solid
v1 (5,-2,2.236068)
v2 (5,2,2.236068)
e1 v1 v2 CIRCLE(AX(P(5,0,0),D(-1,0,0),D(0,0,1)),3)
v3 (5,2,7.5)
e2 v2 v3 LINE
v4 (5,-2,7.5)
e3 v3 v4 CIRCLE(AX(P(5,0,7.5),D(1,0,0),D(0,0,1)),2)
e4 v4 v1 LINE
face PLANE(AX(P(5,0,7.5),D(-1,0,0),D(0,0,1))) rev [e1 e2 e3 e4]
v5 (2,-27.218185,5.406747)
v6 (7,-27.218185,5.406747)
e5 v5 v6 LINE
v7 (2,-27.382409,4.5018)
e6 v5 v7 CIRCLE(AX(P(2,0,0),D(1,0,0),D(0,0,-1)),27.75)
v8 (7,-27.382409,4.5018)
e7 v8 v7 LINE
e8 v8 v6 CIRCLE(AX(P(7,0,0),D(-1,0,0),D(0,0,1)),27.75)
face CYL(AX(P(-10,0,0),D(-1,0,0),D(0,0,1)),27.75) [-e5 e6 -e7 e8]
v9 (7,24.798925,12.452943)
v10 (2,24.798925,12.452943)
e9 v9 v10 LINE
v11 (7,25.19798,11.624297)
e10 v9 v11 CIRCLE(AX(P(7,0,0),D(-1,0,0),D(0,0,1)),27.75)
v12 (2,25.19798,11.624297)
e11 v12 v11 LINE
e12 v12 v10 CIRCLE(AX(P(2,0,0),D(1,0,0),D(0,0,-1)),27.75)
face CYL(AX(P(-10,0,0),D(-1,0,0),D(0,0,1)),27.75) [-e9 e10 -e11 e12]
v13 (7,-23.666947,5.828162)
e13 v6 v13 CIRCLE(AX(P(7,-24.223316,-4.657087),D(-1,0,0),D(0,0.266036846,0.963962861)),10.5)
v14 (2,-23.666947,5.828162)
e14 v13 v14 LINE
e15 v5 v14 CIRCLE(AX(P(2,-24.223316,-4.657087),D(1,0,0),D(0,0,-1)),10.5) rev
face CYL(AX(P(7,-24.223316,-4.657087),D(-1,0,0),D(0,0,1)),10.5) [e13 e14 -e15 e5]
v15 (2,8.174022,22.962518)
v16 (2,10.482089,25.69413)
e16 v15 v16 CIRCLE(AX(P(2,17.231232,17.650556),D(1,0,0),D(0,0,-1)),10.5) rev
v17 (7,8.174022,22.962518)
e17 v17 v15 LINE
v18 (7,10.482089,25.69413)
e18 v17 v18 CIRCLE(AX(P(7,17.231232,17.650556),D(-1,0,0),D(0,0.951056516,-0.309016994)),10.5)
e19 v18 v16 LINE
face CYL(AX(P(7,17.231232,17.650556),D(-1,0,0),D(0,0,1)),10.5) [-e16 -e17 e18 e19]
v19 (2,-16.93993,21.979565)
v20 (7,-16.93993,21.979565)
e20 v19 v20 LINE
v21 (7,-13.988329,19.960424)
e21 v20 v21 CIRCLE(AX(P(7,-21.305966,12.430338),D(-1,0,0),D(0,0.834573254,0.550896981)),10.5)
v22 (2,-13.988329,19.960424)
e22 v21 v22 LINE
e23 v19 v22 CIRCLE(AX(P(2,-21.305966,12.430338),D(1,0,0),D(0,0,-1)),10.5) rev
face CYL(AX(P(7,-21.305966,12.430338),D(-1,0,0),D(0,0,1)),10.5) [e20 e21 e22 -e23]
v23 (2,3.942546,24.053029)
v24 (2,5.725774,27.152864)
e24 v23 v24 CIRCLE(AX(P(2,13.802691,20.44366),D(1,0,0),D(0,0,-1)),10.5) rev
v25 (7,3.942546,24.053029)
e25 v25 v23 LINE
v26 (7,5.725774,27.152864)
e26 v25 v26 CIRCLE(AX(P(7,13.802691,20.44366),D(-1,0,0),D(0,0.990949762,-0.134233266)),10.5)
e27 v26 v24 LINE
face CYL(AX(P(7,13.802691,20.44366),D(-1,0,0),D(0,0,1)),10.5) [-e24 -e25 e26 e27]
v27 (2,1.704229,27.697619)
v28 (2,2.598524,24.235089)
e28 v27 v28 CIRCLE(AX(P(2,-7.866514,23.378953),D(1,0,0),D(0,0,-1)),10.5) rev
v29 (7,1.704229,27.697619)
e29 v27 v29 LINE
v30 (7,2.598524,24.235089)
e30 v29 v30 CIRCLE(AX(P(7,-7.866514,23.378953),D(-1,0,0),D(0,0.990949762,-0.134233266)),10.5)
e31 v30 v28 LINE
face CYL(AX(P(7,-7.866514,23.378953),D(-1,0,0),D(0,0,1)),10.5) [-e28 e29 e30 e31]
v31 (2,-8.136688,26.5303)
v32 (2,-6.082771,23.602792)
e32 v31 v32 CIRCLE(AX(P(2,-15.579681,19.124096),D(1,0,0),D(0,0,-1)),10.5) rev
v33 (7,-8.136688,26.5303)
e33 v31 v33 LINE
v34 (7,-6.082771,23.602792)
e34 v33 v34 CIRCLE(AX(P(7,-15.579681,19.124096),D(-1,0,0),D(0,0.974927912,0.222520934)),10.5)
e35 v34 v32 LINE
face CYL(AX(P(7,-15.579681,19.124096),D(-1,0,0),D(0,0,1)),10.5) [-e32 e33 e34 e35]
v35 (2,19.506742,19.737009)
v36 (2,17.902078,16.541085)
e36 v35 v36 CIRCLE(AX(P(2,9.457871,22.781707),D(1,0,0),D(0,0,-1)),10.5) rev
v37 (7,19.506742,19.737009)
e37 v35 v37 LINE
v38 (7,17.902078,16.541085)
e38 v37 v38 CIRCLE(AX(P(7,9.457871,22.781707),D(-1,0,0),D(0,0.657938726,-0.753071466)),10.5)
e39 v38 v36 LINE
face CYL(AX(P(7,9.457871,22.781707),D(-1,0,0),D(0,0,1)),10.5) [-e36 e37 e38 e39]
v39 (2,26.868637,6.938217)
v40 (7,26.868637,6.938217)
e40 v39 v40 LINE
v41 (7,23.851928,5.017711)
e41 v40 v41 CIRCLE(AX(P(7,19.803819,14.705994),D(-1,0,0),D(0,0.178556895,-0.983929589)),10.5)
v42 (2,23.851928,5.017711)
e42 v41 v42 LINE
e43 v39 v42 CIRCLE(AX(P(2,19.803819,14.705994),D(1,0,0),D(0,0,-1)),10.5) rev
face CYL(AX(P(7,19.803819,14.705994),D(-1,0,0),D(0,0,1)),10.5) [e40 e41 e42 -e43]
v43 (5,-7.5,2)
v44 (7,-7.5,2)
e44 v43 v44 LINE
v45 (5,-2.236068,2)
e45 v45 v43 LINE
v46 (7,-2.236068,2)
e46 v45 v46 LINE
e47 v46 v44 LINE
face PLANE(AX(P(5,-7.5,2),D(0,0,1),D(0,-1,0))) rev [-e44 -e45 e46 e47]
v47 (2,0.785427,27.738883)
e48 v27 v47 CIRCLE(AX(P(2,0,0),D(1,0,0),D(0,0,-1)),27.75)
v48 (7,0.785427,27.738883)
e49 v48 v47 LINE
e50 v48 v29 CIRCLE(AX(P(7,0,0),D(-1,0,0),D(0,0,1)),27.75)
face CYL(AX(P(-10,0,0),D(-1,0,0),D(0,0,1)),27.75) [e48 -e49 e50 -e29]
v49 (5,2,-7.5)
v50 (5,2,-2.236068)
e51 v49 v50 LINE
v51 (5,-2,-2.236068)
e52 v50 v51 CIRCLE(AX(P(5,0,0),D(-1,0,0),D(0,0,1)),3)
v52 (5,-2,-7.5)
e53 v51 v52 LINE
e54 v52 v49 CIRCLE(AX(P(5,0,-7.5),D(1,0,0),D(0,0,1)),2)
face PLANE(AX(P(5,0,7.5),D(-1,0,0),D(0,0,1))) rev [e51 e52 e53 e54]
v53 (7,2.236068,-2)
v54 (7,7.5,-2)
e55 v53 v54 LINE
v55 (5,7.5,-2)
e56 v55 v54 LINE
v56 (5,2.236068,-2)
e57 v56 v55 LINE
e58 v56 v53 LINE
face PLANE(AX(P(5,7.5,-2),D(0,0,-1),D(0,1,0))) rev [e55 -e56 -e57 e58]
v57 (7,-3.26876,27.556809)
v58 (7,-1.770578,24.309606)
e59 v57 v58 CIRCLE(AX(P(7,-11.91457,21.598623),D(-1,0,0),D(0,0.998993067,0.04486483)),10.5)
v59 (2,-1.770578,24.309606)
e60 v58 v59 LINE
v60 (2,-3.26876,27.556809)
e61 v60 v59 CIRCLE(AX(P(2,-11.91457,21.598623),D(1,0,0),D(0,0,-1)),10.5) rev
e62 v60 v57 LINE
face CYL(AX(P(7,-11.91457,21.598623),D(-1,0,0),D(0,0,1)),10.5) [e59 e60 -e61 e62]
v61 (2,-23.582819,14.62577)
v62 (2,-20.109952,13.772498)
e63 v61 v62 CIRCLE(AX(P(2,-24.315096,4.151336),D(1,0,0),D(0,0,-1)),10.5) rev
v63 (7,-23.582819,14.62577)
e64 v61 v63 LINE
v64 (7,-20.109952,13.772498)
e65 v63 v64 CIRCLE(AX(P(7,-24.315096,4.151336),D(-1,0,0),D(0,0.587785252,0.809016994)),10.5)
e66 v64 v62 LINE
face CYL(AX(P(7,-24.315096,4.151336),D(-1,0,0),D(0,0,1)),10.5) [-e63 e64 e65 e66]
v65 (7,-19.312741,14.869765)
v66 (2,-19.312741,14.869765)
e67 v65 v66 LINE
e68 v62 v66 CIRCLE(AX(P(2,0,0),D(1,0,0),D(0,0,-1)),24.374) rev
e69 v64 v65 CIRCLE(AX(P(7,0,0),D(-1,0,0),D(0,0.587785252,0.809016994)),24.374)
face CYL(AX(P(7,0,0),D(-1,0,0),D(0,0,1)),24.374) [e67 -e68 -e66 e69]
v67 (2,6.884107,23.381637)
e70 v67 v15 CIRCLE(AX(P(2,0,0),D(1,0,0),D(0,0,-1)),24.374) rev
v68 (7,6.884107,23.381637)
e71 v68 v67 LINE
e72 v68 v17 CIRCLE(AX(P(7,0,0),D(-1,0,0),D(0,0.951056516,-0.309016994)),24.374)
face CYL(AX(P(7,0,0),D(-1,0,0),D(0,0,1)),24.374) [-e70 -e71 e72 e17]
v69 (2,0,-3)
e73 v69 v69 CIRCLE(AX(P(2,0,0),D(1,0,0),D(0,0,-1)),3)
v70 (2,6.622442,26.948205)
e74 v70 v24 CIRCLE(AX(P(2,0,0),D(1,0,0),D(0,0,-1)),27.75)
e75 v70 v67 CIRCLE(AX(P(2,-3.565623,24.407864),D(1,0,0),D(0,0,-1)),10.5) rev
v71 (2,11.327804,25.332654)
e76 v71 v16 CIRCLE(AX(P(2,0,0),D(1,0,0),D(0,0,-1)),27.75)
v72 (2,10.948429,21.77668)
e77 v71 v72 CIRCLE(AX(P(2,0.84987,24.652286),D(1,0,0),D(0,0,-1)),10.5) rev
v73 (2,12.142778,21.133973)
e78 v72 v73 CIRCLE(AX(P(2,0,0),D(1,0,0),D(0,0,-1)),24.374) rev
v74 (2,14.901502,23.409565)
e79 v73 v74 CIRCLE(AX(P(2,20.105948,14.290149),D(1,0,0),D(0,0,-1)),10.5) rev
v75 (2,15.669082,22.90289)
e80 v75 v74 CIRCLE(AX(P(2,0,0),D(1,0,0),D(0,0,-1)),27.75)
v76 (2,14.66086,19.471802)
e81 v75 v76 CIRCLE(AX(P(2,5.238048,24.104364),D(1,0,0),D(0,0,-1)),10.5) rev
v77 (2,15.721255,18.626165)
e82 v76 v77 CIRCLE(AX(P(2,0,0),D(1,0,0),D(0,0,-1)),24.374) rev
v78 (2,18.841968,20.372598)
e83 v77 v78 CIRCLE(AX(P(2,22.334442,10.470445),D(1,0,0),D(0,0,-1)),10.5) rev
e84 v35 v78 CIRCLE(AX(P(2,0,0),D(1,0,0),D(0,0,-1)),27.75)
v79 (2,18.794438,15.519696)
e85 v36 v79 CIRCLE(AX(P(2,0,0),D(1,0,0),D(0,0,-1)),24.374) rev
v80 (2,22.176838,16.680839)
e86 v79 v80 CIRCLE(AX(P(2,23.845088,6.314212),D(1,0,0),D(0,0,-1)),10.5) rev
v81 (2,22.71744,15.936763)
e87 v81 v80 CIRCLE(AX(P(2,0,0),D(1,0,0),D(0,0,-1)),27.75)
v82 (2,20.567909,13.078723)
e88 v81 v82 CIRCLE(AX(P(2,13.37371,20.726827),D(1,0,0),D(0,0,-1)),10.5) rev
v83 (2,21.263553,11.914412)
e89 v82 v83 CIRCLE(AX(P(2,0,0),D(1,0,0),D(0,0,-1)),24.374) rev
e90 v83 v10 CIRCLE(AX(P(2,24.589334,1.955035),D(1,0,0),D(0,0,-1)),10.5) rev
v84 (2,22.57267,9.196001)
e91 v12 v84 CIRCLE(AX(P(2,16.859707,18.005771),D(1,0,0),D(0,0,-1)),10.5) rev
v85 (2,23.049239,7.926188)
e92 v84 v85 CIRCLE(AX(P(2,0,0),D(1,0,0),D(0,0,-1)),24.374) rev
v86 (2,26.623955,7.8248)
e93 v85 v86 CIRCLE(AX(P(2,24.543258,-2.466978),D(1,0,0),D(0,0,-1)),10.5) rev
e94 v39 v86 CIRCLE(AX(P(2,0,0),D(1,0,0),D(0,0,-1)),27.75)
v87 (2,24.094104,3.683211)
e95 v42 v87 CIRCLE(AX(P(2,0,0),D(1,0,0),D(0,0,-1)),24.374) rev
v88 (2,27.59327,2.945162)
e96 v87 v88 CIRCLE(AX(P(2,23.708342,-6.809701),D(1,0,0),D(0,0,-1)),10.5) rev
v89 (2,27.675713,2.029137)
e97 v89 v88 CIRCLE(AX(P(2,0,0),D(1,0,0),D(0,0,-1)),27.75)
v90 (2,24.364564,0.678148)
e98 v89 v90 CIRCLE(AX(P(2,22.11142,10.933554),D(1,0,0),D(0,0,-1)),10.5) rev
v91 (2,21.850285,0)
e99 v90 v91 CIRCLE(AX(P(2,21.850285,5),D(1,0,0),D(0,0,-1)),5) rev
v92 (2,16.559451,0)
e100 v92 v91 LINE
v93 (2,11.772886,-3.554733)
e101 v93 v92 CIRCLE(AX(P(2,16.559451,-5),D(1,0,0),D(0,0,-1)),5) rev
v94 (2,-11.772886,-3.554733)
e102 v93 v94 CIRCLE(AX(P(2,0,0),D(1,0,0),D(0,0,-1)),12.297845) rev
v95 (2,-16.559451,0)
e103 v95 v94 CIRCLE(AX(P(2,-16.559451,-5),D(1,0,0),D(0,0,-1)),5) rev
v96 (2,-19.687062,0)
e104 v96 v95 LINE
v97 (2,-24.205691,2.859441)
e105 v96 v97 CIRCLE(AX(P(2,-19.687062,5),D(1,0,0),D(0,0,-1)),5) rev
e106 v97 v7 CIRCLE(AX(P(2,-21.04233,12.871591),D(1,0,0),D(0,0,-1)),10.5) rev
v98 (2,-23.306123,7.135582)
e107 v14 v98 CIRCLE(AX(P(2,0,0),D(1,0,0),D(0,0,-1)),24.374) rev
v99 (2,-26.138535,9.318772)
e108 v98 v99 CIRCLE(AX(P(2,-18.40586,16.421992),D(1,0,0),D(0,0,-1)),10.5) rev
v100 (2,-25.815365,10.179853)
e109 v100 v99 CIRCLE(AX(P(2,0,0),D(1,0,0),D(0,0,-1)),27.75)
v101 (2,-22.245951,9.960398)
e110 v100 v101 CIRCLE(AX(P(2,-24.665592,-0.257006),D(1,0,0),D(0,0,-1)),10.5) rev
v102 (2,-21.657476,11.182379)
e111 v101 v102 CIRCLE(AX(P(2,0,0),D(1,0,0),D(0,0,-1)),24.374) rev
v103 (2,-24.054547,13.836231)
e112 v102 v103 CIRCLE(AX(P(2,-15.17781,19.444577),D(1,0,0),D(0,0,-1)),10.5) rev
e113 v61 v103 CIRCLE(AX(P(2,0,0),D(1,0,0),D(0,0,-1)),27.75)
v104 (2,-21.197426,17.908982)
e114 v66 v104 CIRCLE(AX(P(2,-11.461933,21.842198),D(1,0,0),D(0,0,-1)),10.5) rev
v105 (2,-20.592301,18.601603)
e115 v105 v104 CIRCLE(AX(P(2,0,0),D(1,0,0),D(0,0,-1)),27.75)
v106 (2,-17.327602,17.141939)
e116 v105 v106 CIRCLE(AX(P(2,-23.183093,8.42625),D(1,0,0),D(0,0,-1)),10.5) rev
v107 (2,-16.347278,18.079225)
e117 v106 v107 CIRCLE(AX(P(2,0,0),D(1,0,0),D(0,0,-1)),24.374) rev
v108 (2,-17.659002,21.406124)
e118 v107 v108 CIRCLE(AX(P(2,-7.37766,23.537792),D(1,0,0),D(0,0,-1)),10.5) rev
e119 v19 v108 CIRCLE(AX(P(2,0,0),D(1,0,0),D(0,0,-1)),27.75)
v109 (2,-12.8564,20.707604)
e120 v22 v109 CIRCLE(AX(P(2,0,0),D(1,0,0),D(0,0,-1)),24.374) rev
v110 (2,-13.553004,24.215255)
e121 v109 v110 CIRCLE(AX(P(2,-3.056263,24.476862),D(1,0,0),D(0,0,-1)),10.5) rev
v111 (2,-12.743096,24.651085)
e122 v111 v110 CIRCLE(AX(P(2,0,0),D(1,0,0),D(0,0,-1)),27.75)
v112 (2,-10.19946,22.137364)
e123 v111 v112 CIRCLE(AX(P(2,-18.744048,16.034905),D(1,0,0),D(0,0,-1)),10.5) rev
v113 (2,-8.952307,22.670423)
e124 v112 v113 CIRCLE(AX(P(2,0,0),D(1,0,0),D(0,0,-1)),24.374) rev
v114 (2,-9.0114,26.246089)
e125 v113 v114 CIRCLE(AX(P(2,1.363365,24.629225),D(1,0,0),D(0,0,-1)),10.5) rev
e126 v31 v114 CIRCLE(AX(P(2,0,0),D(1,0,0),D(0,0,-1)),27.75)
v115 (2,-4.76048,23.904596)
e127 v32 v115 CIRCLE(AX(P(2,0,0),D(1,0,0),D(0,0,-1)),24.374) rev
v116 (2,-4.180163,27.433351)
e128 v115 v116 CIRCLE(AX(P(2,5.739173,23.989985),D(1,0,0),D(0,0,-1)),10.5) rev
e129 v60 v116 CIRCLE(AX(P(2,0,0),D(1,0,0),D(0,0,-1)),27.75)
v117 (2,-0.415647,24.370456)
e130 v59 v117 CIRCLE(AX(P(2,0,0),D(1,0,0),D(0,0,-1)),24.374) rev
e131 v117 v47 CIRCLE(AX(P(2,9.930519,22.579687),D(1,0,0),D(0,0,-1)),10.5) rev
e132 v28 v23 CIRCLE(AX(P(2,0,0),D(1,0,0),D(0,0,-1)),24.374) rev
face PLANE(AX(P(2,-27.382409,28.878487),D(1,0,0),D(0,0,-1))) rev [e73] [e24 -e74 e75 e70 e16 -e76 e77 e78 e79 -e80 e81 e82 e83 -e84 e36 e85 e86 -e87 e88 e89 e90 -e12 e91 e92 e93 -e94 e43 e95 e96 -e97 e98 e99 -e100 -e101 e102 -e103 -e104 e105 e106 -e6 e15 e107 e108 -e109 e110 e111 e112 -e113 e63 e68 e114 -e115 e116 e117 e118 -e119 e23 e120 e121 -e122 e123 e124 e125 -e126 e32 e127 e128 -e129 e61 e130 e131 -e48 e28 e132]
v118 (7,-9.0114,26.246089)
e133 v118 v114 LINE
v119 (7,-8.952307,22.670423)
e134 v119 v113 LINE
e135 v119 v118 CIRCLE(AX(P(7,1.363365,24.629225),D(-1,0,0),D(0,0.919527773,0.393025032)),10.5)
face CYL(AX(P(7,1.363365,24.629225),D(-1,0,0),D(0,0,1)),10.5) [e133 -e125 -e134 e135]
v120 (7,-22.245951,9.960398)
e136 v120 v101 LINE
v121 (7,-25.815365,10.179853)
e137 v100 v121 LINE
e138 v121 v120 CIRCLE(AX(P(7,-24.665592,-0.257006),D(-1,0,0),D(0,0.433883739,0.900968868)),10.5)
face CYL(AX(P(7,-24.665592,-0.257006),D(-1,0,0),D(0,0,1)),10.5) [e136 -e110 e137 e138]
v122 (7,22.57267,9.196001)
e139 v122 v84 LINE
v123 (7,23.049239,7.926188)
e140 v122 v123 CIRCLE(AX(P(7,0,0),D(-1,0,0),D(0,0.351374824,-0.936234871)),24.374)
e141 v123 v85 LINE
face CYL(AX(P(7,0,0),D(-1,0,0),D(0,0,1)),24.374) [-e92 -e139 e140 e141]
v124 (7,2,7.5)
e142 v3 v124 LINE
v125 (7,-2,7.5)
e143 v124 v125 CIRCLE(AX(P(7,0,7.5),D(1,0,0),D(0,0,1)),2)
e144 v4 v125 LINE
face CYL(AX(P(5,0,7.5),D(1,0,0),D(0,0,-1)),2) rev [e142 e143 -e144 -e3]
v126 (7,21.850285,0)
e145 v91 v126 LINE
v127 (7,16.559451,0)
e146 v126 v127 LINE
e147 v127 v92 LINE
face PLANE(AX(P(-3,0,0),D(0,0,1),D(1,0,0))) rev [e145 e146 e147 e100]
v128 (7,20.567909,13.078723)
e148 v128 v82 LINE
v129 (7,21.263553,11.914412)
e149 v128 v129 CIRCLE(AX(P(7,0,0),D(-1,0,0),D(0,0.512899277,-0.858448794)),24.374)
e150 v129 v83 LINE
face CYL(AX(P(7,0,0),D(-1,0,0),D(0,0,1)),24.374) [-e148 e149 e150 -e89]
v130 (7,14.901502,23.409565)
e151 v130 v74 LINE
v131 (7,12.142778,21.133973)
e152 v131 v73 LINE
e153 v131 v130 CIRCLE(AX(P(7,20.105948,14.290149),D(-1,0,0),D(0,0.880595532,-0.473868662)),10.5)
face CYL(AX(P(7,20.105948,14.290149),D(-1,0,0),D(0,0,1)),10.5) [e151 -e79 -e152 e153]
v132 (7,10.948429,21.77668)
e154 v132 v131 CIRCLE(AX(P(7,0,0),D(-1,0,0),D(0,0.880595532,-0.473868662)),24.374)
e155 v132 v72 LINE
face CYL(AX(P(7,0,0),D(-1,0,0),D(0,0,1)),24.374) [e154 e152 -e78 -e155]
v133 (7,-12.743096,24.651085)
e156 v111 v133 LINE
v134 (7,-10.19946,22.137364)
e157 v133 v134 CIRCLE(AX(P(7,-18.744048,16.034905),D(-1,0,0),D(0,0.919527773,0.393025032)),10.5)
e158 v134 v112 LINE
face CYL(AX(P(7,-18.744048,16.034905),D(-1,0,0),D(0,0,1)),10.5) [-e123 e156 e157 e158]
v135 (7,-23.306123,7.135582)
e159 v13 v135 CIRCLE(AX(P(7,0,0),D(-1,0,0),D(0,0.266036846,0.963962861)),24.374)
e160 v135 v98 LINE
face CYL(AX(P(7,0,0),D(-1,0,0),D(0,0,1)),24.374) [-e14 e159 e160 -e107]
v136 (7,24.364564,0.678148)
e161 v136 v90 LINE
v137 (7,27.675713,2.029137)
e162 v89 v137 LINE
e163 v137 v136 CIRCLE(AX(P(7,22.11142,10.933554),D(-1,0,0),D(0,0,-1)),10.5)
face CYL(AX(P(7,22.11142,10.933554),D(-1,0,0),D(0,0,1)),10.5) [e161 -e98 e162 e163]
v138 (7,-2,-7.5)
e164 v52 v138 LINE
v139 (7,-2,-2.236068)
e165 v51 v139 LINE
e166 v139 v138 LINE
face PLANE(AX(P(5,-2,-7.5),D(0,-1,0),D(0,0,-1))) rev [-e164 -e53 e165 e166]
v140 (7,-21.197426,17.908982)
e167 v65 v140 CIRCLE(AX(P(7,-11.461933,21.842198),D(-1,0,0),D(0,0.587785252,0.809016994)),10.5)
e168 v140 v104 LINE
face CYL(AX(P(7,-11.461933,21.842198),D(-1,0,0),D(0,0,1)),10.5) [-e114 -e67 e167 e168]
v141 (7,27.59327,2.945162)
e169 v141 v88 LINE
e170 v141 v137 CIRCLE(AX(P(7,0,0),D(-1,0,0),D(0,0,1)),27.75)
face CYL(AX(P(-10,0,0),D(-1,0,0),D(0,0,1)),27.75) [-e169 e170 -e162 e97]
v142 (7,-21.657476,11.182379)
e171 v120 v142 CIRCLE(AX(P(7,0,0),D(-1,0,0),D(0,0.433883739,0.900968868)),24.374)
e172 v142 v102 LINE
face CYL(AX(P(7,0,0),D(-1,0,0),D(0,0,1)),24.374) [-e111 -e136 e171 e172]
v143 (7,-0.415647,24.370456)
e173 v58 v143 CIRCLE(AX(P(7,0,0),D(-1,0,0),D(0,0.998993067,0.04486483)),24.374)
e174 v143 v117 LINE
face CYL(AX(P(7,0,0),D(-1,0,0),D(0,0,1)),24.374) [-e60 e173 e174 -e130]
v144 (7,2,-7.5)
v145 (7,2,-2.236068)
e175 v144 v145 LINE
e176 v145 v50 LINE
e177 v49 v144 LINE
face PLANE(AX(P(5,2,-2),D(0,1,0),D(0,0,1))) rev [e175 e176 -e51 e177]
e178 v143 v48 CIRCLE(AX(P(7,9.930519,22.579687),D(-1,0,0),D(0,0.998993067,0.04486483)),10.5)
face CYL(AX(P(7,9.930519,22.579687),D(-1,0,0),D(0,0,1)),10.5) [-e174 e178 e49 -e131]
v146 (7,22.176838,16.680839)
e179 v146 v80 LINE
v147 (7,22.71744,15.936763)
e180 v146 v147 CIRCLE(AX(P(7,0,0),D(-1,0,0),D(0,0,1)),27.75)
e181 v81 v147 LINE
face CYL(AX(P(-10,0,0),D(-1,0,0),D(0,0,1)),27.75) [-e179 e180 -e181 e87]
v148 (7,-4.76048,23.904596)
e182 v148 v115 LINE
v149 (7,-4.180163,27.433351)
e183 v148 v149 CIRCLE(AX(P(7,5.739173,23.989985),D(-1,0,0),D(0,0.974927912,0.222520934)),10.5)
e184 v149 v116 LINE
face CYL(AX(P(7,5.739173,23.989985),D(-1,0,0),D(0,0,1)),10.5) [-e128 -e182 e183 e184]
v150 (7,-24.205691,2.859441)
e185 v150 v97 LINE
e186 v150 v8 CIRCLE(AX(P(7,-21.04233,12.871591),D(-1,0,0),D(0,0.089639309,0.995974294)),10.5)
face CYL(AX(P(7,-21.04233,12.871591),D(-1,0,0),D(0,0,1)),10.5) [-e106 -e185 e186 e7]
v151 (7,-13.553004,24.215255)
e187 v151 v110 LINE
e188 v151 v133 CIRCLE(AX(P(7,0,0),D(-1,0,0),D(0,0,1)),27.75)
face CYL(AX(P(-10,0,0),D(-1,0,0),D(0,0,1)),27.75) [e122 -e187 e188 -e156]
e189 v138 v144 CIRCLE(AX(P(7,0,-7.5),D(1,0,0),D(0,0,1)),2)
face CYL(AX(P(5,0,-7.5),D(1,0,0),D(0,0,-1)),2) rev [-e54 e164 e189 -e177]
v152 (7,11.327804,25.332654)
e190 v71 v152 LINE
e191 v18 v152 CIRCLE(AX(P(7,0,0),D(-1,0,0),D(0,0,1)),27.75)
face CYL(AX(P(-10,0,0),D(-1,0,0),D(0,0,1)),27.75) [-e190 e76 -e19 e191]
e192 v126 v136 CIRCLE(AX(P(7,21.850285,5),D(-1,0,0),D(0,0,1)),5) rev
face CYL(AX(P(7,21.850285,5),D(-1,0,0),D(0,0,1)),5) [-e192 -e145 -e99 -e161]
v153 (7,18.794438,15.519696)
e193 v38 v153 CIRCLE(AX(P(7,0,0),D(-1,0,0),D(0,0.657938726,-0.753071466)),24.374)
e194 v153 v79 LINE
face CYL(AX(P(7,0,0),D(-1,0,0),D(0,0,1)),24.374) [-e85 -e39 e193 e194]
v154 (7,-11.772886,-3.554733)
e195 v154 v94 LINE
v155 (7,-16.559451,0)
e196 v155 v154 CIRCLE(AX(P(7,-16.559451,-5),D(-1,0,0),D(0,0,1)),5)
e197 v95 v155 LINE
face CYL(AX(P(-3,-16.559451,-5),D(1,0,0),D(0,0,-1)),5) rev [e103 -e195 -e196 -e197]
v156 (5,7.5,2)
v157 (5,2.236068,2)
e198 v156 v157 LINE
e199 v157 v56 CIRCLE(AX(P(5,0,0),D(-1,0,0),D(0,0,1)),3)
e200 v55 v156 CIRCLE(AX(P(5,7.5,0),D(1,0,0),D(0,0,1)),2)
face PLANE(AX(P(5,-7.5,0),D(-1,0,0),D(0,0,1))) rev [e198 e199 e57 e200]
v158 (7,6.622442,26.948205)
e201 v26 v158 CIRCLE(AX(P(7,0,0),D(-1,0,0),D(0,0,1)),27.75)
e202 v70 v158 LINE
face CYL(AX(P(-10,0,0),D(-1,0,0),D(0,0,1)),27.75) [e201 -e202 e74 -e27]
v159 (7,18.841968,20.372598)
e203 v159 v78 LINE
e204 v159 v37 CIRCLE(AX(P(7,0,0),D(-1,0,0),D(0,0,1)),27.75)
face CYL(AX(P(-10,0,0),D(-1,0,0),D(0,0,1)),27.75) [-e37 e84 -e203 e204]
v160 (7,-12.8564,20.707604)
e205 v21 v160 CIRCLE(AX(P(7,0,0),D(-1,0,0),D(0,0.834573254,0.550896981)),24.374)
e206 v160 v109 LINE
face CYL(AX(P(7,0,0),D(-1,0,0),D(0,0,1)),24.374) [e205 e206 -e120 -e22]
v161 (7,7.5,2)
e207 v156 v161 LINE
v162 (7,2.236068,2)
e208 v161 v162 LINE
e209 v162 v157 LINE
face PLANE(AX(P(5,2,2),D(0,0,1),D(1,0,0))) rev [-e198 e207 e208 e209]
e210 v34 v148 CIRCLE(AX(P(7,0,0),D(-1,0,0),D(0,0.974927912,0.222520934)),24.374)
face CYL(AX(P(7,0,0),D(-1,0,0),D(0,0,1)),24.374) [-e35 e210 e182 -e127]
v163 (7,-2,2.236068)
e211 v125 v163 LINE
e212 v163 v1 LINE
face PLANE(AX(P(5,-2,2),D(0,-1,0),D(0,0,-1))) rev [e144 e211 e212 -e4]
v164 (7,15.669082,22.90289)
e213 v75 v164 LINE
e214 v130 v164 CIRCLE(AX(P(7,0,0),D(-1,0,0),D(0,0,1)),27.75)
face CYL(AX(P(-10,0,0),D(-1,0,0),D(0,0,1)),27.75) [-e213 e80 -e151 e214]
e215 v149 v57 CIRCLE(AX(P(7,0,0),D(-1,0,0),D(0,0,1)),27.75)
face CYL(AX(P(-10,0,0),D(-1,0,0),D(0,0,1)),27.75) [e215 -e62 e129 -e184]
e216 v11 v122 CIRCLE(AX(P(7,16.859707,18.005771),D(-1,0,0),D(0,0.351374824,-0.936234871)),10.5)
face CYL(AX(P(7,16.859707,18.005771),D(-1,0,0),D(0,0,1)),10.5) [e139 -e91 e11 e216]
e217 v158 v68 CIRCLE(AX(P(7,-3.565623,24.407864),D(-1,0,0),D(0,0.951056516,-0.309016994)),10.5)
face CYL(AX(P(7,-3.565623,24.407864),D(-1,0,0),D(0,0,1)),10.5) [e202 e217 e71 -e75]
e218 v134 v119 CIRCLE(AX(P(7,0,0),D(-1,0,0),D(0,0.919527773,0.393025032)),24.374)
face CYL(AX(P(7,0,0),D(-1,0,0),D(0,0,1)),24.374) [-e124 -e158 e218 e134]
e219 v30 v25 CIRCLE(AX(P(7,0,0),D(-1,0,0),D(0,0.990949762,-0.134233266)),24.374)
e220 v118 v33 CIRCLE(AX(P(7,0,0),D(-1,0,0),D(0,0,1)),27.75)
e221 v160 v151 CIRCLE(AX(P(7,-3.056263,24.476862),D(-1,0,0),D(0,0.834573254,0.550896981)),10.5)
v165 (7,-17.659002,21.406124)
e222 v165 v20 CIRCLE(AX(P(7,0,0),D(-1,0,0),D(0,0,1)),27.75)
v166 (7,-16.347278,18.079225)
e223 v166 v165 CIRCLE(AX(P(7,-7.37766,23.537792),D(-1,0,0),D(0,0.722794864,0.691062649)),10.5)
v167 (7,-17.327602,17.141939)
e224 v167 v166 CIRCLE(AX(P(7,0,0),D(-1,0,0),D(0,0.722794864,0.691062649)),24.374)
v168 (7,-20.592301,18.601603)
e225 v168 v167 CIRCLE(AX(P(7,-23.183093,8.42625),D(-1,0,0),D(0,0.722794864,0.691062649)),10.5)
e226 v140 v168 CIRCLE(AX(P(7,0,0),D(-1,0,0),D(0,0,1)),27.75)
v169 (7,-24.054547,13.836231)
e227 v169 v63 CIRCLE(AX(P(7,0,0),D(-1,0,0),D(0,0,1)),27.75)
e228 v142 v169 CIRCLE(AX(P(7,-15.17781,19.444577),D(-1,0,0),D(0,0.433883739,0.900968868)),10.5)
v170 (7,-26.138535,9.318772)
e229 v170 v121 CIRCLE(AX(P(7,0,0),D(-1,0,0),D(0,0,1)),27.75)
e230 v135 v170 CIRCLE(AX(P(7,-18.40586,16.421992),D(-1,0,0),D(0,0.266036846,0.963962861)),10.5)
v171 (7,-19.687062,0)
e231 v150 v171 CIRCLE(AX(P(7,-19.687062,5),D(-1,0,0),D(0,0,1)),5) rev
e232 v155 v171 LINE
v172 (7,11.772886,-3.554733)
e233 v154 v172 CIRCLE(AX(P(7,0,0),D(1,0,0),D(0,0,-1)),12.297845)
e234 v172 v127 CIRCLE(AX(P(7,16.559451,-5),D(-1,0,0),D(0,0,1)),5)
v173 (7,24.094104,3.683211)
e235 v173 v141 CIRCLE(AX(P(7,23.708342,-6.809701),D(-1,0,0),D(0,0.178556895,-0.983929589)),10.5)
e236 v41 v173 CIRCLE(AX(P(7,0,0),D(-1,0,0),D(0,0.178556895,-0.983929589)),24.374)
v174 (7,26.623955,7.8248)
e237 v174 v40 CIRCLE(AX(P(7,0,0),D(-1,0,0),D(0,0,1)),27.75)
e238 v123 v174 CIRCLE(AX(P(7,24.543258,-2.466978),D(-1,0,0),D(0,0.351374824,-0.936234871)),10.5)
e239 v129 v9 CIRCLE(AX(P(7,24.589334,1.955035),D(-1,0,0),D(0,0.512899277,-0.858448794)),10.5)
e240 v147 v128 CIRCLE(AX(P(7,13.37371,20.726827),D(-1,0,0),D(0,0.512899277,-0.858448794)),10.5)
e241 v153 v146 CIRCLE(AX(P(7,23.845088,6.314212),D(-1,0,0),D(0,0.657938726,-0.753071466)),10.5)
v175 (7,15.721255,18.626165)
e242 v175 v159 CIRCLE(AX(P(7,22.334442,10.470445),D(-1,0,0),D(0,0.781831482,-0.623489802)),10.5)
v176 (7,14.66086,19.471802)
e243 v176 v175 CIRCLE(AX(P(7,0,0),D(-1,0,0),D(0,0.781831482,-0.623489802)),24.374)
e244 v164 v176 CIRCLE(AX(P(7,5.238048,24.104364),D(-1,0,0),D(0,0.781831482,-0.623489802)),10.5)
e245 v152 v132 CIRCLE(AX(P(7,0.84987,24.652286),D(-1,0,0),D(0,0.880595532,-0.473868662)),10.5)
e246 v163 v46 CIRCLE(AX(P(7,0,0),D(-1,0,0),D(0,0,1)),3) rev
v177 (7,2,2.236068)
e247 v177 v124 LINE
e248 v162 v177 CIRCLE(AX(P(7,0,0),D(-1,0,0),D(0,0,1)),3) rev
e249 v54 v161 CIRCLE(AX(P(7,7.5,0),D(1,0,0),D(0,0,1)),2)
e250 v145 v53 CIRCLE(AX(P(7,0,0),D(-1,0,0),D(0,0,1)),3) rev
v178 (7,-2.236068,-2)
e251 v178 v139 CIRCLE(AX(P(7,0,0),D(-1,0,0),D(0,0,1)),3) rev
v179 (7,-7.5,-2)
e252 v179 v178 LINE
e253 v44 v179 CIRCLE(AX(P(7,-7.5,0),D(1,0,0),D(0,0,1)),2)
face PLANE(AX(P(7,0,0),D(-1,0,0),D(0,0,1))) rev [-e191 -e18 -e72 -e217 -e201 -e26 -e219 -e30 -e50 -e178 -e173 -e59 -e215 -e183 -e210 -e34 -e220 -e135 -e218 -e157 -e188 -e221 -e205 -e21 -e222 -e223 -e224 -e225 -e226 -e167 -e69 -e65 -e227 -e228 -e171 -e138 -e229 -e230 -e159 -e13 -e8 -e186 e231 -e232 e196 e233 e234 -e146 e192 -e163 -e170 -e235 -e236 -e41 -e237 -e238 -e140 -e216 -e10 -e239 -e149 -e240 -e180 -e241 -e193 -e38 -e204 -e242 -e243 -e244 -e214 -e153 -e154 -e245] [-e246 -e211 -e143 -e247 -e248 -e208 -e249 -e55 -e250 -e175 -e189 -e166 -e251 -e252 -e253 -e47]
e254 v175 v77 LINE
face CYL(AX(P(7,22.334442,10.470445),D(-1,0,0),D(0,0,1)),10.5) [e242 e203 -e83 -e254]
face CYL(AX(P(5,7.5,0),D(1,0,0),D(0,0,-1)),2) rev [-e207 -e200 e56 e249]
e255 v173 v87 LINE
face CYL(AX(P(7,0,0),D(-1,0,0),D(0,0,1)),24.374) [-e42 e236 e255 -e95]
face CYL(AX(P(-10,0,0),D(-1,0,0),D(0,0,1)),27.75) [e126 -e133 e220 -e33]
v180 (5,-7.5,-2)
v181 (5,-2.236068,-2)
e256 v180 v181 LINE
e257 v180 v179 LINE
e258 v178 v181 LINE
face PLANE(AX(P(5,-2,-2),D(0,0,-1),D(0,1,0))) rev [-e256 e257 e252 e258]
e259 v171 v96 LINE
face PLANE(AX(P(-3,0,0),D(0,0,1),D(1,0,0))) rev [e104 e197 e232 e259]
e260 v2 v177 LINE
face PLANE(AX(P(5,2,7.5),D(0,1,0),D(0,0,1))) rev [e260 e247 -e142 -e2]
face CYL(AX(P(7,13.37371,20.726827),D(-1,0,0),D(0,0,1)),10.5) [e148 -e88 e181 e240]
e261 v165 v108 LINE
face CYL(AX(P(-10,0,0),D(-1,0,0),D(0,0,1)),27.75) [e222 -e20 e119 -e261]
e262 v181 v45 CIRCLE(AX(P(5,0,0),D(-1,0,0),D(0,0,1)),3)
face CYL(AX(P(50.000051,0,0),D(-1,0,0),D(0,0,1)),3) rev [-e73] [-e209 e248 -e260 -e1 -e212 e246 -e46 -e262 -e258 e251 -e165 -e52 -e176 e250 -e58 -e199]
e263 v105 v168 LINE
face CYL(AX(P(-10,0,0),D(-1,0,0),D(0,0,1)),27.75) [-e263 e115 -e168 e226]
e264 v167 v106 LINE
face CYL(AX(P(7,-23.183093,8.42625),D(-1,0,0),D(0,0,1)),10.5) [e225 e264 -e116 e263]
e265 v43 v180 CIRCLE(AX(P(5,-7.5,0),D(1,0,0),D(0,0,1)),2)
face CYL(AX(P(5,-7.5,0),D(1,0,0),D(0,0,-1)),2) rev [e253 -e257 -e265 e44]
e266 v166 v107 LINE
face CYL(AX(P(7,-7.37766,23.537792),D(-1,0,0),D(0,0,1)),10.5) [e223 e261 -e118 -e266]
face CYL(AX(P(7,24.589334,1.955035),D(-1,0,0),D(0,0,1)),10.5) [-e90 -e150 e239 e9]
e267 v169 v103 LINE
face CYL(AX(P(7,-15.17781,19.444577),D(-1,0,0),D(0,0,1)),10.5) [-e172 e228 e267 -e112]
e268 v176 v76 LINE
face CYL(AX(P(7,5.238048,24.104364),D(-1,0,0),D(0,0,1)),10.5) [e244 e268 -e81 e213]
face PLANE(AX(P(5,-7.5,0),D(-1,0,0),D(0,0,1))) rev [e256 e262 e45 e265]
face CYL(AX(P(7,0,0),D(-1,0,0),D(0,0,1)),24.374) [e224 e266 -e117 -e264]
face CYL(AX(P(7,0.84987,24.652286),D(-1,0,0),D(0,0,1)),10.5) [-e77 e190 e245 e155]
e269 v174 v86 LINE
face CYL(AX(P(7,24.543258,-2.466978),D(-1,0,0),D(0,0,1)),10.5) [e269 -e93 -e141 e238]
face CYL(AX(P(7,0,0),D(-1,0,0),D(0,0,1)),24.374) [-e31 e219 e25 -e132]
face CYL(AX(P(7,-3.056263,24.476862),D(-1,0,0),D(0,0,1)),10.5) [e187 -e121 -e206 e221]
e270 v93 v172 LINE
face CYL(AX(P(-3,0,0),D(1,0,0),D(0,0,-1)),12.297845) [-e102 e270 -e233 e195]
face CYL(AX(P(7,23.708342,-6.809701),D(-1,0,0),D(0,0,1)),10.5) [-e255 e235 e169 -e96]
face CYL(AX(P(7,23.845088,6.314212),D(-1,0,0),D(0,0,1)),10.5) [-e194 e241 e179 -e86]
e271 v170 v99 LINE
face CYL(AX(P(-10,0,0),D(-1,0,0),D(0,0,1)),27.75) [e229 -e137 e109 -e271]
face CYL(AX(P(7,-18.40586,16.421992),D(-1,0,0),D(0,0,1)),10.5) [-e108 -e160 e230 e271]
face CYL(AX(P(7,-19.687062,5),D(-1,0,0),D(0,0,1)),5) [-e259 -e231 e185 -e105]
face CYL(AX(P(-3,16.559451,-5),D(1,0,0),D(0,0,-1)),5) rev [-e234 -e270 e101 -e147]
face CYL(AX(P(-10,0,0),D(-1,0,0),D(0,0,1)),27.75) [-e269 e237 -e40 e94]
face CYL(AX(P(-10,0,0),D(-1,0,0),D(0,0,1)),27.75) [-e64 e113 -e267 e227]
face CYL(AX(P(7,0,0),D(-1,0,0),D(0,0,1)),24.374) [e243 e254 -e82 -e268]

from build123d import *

# Parameters (mm, degrees)
BASPROSKE_W             = 7
BASPROSKE_H             = 27.75
TOOTHCUT_DEPTH          = 40.863830724
TEETHCUTS_COUNT         = 35
TEETHCUTS_ANGLE         = 349.714285714
BORSKE_R                = 3
BORE_DEPTH              = 50.0000508
CUT_EXTRUDE1_DEPTH      = 2
CUT_EXTRUDE2_DEPTH      = 2
CUT_EXTRUDE3_DEPTH      = 10
CUT_EXTRUDE4_DEPTH      = 2
FILLET2_R               = 5
CUT_EXTRUDE5_DEPTH      = 10
FILLET3_R               = 5
CUT_EXTRUDE6_DEPTH      = 40.804405632
CUT_EXTRUDE6_DEPTH_BACK = 40.804405632


with BuildPart() as part:
    # BasProSke → Base-Revolve (revolve)
    with BuildSketch(Plane(origin=(0, 0, 0), x_dir=(1, 0, 0), z_dir=(0, 1, 0)), mode=Mode.PRIVATE) as base_revolve_sk:
        with Locations((3.5, 13.875)):
            Rectangle(BASPROSKE_W, BASPROSKE_H)
    revolve(base_revolve_sk.sketch.rotate(Axis((-10, 0, 0), (1, 0, 0)), 180), axis=Axis((-10, 0, 0), (1, 0, 0)))

    # TooCutSke → ToothCut (cut, through all)
    with BuildSketch(Plane(origin=(0, 0, 0), x_dir=(0, 0, -1), z_dir=(1, 0, 0))):
        with BuildLine():
            ThreePointArc((0.678148312, 24.364564245), (0, 24.374), (-0.678148312, 24.364564245))
            ThreePointArc((-0.678148312, 24.364564245), (-1.217075524, 26.091376176), (-2.044396801, 27.70005933))
            ThreePointArc((-2.044396801, 27.70005933), (0, 27.7754), (2.044396801, 27.70005933))
            ThreePointArc((2.044396801, 27.70005933), (1.217075524, 26.091376176), (0.678148312, 24.364564245))
        make_face()
    toothcut = extrude(amount=TOOTHCUT_DEPTH, mode=Mode.SUBTRACT)

    # TeethCuts: ToothCut ×35 about axis
    teethcuts_axis = Axis((-10, 0, 0), (1, 0, 0))
    for i in range(1, TEETHCUTS_COUNT):
        add(toothcut.rotate(teethcuts_axis, i * TEETHCUTS_ANGLE / (TEETHCUTS_COUNT - 1)), mode=Mode.SUBTRACT)

    # BorSke → Bore (cut, symmetric)
    with BuildSketch(Plane(origin=(0, 0, 0), x_dir=(0, 0, -1), z_dir=(1, 0, 0))):
        with Locations(Location((0, 0, 0), (0, 0, 180))):
            Circle(BORSKE_R)
    extrude(amount=BORE_DEPTH, both=True, mode=Mode.SUBTRACT)

    # Sketch3 → Cut-Extrude1 (cut)
    with BuildSketch(Plane(origin=(7, 0, 0), x_dir=(0, 0, -1), z_dir=(1, 0, 0))):
        with BuildLine():
            Line((-1.5, -7.5), (-1.5, 7.5))
            ThreePointArc((-1.5, 7.5), (0, 9), (1.5, 7.5))
            Line((1.5, 7.5), (1.5, -7.5))
            ThreePointArc((1.5, -7.5), (0, -9), (-1.5, -7.5))
        make_face()
    extrude(amount=-CUT_EXTRUDE1_DEPTH, mode=Mode.SUBTRACT)

    # Sketch4 → Cut-Extrude2 (cut)
    with BuildSketch(Plane(origin=(7, 0, 0), x_dir=(0, 0, -1), z_dir=(1, 0, 0))):
        with BuildLine():
            Line((-7.5, 1.5), (7.5, 1.5))
            ThreePointArc((7.5, 1.5), (9, 0), (7.5, -1.5))
            Line((7.5, -1.5), (-7.5, -1.5))
            ThreePointArc((-7.5, -1.5), (-9, 0), (-7.5, 1.5))
        make_face()
    extrude(amount=-CUT_EXTRUDE2_DEPTH, mode=Mode.SUBTRACT)

    # Sketch5 → Cut-Extrude3 (cut)
    with BuildSketch(Plane(origin=(7, 0, 0), x_dir=(0, 0, -1), z_dir=(1, 0, 0))):
        with BuildLine():
            ThreePointArc((12.297844577, 0), (8.695889295, -8.695889295), (0, -12.297844577))
            Line((0, -12.297844577), (0, -32.483772695))
            ThreePointArc((0, -32.483772695), (32.823056407, 0.339283713), (0, 33.16234012))
            Line((0, 33.16234012), (0, 12.297844577))
            ThreePointArc((0, 12.297844577), (8.695889295, 8.695889295), (12.297844577, 0))
        make_face()
    extrude(amount=-CUT_EXTRUDE3_DEPTH, mode=Mode.SUBTRACT)

    # Sketch6 → Cut-Extrude4 (cut)
    with BuildSketch(Plane(origin=(7, 0, 0), x_dir=(0, 0, -1), z_dir=(1, 0, 0))):
        with BuildLine():
            Line((-2, 2), (-2, 7.5))
            ThreePointArc((-2, 7.5), (0, 9.5), (2, 7.5))
            Line((2, 7.5), (2, 2))
            Line((2, 2), (7.5, 2))
            ThreePointArc((7.5, 2), (9.5, 0), (7.5, -2))
            Line((7.5, -2), (2, -2))
            Line((2, -2), (2, -7.5))
            ThreePointArc((2, -7.5), (0, -9.5), (-2, -7.5))
            Line((-2, -7.5), (-2, -2))
            Line((-2, -2), (-7.5, -2))
            ThreePointArc((-7.5, -2), (-9.5, 0), (-7.5, 2))
            Line((-7.5, 2), (-2, 2))
        make_face()
    extrude(amount=-CUT_EXTRUDE4_DEPTH, mode=Mode.SUBTRACT)

    # Fillet2
    fillet2_edges = [part.edges().sort_by_distance(p)[0] for p in [
        (3.5, -12.297844577, 0),
        (3.5, 12.297844577, 0),
    ]]
    fillet(fillet2_edges, radius=FILLET2_R)

    # Sketch8 → Cut-Extrude5 (cut)
    with BuildSketch(Plane(origin=(7, 0, 0), x_dir=(0, 0, -1), z_dir=(1, 0, 0))):
        Polygon((-2.859440987, -24.205690927), (-1.508604415, -24.327268419), (1.243700079, -24.574980307), (1.243700079, -32.134713867), (-1.933875746, -26.979191879), align=None)
    extrude(amount=-CUT_EXTRUDE5_DEPTH, mode=Mode.SUBTRACT)

    # Fillet3
    # the kernel refuses this fillet: 5 mm, written as the material it takes off along each edge
    with BuildSketch(Plane(origin=(13.309286436, 24.374, 0), x_dir=(0, -1, 0), z_dir=(-1, 0, 0))) as fillet3_piece_1:
        with BuildLine():
            CenterArc((2.523714574, 5), FILLET3_R, 239.81088364, 30.18911636)
            Line((0.009435755, 0.678148312), (-0.040849822, 0.591711278))
            ThreePointArc((-0.040849822, 0.591711278), (-0.097631269, 0.340498242), (-0.1, 0))
            Line((-0.1, 0), (0, -0.1))
            Line((0, -0.1), (2.523714574, -0.1))
            Line((2.523714574, -0.1), (2.523714574, 0))
        make_face()
    extrude(amount=19.618572871, mode=Mode.SUBTRACT)
    with BuildSketch(Plane(origin=(-11.93995811, -24.463045274, 0), x_dir=(0, 0.08963930890343594, 0.995974293995239), z_dir=(1, 0, 0))) as fillet3_piece_2:
        with BuildLine():
            CenterArc((5.407987307, -4.308559995), FILLET3_R, 120.490647096, 64.652210046)
            Line((0.428115837, -4.75675654), (0.328518408, -4.76572047))
            Line((0.328518408, -4.76572047), (-0.099597429, -0.008963931))
            Line((-0.099597429, -0.008963931), (0, 0.1))
            ThreePointArc((0, 0.1), (1.435499392, 0.1), (2.820259013, 0.0861712))
            Line((2.820259013, 0.0861712), (2.870998784, 0))
        make_face()
    extrude(amount=30.87991622, mode=Mode.SUBTRACT)

    # Sketch9 → Cut-Extrude6 (cut, two sides: drawn at the far end of the back side and taken through both)
    with BuildSketch(Plane(origin=(0, 0, 0), x_dir=(1, 0, 0), z_dir=(0, 1, 0)).offset(-CUT_EXTRUDE6_DEPTH_BACK)):
        Polygon((-2.448455727, -28.878486524), (2, -28.878486524), (2, 12.992603003), (-3.949809534, 12.992603003), (-3.949809534, -28.878486524), align=None)
    extrude(amount=CUT_EXTRUDE6_DEPTH + CUT_EXTRUDE6_DEPTH_BACK, mode=Mode.SUBTRACT)


solid = part.part
